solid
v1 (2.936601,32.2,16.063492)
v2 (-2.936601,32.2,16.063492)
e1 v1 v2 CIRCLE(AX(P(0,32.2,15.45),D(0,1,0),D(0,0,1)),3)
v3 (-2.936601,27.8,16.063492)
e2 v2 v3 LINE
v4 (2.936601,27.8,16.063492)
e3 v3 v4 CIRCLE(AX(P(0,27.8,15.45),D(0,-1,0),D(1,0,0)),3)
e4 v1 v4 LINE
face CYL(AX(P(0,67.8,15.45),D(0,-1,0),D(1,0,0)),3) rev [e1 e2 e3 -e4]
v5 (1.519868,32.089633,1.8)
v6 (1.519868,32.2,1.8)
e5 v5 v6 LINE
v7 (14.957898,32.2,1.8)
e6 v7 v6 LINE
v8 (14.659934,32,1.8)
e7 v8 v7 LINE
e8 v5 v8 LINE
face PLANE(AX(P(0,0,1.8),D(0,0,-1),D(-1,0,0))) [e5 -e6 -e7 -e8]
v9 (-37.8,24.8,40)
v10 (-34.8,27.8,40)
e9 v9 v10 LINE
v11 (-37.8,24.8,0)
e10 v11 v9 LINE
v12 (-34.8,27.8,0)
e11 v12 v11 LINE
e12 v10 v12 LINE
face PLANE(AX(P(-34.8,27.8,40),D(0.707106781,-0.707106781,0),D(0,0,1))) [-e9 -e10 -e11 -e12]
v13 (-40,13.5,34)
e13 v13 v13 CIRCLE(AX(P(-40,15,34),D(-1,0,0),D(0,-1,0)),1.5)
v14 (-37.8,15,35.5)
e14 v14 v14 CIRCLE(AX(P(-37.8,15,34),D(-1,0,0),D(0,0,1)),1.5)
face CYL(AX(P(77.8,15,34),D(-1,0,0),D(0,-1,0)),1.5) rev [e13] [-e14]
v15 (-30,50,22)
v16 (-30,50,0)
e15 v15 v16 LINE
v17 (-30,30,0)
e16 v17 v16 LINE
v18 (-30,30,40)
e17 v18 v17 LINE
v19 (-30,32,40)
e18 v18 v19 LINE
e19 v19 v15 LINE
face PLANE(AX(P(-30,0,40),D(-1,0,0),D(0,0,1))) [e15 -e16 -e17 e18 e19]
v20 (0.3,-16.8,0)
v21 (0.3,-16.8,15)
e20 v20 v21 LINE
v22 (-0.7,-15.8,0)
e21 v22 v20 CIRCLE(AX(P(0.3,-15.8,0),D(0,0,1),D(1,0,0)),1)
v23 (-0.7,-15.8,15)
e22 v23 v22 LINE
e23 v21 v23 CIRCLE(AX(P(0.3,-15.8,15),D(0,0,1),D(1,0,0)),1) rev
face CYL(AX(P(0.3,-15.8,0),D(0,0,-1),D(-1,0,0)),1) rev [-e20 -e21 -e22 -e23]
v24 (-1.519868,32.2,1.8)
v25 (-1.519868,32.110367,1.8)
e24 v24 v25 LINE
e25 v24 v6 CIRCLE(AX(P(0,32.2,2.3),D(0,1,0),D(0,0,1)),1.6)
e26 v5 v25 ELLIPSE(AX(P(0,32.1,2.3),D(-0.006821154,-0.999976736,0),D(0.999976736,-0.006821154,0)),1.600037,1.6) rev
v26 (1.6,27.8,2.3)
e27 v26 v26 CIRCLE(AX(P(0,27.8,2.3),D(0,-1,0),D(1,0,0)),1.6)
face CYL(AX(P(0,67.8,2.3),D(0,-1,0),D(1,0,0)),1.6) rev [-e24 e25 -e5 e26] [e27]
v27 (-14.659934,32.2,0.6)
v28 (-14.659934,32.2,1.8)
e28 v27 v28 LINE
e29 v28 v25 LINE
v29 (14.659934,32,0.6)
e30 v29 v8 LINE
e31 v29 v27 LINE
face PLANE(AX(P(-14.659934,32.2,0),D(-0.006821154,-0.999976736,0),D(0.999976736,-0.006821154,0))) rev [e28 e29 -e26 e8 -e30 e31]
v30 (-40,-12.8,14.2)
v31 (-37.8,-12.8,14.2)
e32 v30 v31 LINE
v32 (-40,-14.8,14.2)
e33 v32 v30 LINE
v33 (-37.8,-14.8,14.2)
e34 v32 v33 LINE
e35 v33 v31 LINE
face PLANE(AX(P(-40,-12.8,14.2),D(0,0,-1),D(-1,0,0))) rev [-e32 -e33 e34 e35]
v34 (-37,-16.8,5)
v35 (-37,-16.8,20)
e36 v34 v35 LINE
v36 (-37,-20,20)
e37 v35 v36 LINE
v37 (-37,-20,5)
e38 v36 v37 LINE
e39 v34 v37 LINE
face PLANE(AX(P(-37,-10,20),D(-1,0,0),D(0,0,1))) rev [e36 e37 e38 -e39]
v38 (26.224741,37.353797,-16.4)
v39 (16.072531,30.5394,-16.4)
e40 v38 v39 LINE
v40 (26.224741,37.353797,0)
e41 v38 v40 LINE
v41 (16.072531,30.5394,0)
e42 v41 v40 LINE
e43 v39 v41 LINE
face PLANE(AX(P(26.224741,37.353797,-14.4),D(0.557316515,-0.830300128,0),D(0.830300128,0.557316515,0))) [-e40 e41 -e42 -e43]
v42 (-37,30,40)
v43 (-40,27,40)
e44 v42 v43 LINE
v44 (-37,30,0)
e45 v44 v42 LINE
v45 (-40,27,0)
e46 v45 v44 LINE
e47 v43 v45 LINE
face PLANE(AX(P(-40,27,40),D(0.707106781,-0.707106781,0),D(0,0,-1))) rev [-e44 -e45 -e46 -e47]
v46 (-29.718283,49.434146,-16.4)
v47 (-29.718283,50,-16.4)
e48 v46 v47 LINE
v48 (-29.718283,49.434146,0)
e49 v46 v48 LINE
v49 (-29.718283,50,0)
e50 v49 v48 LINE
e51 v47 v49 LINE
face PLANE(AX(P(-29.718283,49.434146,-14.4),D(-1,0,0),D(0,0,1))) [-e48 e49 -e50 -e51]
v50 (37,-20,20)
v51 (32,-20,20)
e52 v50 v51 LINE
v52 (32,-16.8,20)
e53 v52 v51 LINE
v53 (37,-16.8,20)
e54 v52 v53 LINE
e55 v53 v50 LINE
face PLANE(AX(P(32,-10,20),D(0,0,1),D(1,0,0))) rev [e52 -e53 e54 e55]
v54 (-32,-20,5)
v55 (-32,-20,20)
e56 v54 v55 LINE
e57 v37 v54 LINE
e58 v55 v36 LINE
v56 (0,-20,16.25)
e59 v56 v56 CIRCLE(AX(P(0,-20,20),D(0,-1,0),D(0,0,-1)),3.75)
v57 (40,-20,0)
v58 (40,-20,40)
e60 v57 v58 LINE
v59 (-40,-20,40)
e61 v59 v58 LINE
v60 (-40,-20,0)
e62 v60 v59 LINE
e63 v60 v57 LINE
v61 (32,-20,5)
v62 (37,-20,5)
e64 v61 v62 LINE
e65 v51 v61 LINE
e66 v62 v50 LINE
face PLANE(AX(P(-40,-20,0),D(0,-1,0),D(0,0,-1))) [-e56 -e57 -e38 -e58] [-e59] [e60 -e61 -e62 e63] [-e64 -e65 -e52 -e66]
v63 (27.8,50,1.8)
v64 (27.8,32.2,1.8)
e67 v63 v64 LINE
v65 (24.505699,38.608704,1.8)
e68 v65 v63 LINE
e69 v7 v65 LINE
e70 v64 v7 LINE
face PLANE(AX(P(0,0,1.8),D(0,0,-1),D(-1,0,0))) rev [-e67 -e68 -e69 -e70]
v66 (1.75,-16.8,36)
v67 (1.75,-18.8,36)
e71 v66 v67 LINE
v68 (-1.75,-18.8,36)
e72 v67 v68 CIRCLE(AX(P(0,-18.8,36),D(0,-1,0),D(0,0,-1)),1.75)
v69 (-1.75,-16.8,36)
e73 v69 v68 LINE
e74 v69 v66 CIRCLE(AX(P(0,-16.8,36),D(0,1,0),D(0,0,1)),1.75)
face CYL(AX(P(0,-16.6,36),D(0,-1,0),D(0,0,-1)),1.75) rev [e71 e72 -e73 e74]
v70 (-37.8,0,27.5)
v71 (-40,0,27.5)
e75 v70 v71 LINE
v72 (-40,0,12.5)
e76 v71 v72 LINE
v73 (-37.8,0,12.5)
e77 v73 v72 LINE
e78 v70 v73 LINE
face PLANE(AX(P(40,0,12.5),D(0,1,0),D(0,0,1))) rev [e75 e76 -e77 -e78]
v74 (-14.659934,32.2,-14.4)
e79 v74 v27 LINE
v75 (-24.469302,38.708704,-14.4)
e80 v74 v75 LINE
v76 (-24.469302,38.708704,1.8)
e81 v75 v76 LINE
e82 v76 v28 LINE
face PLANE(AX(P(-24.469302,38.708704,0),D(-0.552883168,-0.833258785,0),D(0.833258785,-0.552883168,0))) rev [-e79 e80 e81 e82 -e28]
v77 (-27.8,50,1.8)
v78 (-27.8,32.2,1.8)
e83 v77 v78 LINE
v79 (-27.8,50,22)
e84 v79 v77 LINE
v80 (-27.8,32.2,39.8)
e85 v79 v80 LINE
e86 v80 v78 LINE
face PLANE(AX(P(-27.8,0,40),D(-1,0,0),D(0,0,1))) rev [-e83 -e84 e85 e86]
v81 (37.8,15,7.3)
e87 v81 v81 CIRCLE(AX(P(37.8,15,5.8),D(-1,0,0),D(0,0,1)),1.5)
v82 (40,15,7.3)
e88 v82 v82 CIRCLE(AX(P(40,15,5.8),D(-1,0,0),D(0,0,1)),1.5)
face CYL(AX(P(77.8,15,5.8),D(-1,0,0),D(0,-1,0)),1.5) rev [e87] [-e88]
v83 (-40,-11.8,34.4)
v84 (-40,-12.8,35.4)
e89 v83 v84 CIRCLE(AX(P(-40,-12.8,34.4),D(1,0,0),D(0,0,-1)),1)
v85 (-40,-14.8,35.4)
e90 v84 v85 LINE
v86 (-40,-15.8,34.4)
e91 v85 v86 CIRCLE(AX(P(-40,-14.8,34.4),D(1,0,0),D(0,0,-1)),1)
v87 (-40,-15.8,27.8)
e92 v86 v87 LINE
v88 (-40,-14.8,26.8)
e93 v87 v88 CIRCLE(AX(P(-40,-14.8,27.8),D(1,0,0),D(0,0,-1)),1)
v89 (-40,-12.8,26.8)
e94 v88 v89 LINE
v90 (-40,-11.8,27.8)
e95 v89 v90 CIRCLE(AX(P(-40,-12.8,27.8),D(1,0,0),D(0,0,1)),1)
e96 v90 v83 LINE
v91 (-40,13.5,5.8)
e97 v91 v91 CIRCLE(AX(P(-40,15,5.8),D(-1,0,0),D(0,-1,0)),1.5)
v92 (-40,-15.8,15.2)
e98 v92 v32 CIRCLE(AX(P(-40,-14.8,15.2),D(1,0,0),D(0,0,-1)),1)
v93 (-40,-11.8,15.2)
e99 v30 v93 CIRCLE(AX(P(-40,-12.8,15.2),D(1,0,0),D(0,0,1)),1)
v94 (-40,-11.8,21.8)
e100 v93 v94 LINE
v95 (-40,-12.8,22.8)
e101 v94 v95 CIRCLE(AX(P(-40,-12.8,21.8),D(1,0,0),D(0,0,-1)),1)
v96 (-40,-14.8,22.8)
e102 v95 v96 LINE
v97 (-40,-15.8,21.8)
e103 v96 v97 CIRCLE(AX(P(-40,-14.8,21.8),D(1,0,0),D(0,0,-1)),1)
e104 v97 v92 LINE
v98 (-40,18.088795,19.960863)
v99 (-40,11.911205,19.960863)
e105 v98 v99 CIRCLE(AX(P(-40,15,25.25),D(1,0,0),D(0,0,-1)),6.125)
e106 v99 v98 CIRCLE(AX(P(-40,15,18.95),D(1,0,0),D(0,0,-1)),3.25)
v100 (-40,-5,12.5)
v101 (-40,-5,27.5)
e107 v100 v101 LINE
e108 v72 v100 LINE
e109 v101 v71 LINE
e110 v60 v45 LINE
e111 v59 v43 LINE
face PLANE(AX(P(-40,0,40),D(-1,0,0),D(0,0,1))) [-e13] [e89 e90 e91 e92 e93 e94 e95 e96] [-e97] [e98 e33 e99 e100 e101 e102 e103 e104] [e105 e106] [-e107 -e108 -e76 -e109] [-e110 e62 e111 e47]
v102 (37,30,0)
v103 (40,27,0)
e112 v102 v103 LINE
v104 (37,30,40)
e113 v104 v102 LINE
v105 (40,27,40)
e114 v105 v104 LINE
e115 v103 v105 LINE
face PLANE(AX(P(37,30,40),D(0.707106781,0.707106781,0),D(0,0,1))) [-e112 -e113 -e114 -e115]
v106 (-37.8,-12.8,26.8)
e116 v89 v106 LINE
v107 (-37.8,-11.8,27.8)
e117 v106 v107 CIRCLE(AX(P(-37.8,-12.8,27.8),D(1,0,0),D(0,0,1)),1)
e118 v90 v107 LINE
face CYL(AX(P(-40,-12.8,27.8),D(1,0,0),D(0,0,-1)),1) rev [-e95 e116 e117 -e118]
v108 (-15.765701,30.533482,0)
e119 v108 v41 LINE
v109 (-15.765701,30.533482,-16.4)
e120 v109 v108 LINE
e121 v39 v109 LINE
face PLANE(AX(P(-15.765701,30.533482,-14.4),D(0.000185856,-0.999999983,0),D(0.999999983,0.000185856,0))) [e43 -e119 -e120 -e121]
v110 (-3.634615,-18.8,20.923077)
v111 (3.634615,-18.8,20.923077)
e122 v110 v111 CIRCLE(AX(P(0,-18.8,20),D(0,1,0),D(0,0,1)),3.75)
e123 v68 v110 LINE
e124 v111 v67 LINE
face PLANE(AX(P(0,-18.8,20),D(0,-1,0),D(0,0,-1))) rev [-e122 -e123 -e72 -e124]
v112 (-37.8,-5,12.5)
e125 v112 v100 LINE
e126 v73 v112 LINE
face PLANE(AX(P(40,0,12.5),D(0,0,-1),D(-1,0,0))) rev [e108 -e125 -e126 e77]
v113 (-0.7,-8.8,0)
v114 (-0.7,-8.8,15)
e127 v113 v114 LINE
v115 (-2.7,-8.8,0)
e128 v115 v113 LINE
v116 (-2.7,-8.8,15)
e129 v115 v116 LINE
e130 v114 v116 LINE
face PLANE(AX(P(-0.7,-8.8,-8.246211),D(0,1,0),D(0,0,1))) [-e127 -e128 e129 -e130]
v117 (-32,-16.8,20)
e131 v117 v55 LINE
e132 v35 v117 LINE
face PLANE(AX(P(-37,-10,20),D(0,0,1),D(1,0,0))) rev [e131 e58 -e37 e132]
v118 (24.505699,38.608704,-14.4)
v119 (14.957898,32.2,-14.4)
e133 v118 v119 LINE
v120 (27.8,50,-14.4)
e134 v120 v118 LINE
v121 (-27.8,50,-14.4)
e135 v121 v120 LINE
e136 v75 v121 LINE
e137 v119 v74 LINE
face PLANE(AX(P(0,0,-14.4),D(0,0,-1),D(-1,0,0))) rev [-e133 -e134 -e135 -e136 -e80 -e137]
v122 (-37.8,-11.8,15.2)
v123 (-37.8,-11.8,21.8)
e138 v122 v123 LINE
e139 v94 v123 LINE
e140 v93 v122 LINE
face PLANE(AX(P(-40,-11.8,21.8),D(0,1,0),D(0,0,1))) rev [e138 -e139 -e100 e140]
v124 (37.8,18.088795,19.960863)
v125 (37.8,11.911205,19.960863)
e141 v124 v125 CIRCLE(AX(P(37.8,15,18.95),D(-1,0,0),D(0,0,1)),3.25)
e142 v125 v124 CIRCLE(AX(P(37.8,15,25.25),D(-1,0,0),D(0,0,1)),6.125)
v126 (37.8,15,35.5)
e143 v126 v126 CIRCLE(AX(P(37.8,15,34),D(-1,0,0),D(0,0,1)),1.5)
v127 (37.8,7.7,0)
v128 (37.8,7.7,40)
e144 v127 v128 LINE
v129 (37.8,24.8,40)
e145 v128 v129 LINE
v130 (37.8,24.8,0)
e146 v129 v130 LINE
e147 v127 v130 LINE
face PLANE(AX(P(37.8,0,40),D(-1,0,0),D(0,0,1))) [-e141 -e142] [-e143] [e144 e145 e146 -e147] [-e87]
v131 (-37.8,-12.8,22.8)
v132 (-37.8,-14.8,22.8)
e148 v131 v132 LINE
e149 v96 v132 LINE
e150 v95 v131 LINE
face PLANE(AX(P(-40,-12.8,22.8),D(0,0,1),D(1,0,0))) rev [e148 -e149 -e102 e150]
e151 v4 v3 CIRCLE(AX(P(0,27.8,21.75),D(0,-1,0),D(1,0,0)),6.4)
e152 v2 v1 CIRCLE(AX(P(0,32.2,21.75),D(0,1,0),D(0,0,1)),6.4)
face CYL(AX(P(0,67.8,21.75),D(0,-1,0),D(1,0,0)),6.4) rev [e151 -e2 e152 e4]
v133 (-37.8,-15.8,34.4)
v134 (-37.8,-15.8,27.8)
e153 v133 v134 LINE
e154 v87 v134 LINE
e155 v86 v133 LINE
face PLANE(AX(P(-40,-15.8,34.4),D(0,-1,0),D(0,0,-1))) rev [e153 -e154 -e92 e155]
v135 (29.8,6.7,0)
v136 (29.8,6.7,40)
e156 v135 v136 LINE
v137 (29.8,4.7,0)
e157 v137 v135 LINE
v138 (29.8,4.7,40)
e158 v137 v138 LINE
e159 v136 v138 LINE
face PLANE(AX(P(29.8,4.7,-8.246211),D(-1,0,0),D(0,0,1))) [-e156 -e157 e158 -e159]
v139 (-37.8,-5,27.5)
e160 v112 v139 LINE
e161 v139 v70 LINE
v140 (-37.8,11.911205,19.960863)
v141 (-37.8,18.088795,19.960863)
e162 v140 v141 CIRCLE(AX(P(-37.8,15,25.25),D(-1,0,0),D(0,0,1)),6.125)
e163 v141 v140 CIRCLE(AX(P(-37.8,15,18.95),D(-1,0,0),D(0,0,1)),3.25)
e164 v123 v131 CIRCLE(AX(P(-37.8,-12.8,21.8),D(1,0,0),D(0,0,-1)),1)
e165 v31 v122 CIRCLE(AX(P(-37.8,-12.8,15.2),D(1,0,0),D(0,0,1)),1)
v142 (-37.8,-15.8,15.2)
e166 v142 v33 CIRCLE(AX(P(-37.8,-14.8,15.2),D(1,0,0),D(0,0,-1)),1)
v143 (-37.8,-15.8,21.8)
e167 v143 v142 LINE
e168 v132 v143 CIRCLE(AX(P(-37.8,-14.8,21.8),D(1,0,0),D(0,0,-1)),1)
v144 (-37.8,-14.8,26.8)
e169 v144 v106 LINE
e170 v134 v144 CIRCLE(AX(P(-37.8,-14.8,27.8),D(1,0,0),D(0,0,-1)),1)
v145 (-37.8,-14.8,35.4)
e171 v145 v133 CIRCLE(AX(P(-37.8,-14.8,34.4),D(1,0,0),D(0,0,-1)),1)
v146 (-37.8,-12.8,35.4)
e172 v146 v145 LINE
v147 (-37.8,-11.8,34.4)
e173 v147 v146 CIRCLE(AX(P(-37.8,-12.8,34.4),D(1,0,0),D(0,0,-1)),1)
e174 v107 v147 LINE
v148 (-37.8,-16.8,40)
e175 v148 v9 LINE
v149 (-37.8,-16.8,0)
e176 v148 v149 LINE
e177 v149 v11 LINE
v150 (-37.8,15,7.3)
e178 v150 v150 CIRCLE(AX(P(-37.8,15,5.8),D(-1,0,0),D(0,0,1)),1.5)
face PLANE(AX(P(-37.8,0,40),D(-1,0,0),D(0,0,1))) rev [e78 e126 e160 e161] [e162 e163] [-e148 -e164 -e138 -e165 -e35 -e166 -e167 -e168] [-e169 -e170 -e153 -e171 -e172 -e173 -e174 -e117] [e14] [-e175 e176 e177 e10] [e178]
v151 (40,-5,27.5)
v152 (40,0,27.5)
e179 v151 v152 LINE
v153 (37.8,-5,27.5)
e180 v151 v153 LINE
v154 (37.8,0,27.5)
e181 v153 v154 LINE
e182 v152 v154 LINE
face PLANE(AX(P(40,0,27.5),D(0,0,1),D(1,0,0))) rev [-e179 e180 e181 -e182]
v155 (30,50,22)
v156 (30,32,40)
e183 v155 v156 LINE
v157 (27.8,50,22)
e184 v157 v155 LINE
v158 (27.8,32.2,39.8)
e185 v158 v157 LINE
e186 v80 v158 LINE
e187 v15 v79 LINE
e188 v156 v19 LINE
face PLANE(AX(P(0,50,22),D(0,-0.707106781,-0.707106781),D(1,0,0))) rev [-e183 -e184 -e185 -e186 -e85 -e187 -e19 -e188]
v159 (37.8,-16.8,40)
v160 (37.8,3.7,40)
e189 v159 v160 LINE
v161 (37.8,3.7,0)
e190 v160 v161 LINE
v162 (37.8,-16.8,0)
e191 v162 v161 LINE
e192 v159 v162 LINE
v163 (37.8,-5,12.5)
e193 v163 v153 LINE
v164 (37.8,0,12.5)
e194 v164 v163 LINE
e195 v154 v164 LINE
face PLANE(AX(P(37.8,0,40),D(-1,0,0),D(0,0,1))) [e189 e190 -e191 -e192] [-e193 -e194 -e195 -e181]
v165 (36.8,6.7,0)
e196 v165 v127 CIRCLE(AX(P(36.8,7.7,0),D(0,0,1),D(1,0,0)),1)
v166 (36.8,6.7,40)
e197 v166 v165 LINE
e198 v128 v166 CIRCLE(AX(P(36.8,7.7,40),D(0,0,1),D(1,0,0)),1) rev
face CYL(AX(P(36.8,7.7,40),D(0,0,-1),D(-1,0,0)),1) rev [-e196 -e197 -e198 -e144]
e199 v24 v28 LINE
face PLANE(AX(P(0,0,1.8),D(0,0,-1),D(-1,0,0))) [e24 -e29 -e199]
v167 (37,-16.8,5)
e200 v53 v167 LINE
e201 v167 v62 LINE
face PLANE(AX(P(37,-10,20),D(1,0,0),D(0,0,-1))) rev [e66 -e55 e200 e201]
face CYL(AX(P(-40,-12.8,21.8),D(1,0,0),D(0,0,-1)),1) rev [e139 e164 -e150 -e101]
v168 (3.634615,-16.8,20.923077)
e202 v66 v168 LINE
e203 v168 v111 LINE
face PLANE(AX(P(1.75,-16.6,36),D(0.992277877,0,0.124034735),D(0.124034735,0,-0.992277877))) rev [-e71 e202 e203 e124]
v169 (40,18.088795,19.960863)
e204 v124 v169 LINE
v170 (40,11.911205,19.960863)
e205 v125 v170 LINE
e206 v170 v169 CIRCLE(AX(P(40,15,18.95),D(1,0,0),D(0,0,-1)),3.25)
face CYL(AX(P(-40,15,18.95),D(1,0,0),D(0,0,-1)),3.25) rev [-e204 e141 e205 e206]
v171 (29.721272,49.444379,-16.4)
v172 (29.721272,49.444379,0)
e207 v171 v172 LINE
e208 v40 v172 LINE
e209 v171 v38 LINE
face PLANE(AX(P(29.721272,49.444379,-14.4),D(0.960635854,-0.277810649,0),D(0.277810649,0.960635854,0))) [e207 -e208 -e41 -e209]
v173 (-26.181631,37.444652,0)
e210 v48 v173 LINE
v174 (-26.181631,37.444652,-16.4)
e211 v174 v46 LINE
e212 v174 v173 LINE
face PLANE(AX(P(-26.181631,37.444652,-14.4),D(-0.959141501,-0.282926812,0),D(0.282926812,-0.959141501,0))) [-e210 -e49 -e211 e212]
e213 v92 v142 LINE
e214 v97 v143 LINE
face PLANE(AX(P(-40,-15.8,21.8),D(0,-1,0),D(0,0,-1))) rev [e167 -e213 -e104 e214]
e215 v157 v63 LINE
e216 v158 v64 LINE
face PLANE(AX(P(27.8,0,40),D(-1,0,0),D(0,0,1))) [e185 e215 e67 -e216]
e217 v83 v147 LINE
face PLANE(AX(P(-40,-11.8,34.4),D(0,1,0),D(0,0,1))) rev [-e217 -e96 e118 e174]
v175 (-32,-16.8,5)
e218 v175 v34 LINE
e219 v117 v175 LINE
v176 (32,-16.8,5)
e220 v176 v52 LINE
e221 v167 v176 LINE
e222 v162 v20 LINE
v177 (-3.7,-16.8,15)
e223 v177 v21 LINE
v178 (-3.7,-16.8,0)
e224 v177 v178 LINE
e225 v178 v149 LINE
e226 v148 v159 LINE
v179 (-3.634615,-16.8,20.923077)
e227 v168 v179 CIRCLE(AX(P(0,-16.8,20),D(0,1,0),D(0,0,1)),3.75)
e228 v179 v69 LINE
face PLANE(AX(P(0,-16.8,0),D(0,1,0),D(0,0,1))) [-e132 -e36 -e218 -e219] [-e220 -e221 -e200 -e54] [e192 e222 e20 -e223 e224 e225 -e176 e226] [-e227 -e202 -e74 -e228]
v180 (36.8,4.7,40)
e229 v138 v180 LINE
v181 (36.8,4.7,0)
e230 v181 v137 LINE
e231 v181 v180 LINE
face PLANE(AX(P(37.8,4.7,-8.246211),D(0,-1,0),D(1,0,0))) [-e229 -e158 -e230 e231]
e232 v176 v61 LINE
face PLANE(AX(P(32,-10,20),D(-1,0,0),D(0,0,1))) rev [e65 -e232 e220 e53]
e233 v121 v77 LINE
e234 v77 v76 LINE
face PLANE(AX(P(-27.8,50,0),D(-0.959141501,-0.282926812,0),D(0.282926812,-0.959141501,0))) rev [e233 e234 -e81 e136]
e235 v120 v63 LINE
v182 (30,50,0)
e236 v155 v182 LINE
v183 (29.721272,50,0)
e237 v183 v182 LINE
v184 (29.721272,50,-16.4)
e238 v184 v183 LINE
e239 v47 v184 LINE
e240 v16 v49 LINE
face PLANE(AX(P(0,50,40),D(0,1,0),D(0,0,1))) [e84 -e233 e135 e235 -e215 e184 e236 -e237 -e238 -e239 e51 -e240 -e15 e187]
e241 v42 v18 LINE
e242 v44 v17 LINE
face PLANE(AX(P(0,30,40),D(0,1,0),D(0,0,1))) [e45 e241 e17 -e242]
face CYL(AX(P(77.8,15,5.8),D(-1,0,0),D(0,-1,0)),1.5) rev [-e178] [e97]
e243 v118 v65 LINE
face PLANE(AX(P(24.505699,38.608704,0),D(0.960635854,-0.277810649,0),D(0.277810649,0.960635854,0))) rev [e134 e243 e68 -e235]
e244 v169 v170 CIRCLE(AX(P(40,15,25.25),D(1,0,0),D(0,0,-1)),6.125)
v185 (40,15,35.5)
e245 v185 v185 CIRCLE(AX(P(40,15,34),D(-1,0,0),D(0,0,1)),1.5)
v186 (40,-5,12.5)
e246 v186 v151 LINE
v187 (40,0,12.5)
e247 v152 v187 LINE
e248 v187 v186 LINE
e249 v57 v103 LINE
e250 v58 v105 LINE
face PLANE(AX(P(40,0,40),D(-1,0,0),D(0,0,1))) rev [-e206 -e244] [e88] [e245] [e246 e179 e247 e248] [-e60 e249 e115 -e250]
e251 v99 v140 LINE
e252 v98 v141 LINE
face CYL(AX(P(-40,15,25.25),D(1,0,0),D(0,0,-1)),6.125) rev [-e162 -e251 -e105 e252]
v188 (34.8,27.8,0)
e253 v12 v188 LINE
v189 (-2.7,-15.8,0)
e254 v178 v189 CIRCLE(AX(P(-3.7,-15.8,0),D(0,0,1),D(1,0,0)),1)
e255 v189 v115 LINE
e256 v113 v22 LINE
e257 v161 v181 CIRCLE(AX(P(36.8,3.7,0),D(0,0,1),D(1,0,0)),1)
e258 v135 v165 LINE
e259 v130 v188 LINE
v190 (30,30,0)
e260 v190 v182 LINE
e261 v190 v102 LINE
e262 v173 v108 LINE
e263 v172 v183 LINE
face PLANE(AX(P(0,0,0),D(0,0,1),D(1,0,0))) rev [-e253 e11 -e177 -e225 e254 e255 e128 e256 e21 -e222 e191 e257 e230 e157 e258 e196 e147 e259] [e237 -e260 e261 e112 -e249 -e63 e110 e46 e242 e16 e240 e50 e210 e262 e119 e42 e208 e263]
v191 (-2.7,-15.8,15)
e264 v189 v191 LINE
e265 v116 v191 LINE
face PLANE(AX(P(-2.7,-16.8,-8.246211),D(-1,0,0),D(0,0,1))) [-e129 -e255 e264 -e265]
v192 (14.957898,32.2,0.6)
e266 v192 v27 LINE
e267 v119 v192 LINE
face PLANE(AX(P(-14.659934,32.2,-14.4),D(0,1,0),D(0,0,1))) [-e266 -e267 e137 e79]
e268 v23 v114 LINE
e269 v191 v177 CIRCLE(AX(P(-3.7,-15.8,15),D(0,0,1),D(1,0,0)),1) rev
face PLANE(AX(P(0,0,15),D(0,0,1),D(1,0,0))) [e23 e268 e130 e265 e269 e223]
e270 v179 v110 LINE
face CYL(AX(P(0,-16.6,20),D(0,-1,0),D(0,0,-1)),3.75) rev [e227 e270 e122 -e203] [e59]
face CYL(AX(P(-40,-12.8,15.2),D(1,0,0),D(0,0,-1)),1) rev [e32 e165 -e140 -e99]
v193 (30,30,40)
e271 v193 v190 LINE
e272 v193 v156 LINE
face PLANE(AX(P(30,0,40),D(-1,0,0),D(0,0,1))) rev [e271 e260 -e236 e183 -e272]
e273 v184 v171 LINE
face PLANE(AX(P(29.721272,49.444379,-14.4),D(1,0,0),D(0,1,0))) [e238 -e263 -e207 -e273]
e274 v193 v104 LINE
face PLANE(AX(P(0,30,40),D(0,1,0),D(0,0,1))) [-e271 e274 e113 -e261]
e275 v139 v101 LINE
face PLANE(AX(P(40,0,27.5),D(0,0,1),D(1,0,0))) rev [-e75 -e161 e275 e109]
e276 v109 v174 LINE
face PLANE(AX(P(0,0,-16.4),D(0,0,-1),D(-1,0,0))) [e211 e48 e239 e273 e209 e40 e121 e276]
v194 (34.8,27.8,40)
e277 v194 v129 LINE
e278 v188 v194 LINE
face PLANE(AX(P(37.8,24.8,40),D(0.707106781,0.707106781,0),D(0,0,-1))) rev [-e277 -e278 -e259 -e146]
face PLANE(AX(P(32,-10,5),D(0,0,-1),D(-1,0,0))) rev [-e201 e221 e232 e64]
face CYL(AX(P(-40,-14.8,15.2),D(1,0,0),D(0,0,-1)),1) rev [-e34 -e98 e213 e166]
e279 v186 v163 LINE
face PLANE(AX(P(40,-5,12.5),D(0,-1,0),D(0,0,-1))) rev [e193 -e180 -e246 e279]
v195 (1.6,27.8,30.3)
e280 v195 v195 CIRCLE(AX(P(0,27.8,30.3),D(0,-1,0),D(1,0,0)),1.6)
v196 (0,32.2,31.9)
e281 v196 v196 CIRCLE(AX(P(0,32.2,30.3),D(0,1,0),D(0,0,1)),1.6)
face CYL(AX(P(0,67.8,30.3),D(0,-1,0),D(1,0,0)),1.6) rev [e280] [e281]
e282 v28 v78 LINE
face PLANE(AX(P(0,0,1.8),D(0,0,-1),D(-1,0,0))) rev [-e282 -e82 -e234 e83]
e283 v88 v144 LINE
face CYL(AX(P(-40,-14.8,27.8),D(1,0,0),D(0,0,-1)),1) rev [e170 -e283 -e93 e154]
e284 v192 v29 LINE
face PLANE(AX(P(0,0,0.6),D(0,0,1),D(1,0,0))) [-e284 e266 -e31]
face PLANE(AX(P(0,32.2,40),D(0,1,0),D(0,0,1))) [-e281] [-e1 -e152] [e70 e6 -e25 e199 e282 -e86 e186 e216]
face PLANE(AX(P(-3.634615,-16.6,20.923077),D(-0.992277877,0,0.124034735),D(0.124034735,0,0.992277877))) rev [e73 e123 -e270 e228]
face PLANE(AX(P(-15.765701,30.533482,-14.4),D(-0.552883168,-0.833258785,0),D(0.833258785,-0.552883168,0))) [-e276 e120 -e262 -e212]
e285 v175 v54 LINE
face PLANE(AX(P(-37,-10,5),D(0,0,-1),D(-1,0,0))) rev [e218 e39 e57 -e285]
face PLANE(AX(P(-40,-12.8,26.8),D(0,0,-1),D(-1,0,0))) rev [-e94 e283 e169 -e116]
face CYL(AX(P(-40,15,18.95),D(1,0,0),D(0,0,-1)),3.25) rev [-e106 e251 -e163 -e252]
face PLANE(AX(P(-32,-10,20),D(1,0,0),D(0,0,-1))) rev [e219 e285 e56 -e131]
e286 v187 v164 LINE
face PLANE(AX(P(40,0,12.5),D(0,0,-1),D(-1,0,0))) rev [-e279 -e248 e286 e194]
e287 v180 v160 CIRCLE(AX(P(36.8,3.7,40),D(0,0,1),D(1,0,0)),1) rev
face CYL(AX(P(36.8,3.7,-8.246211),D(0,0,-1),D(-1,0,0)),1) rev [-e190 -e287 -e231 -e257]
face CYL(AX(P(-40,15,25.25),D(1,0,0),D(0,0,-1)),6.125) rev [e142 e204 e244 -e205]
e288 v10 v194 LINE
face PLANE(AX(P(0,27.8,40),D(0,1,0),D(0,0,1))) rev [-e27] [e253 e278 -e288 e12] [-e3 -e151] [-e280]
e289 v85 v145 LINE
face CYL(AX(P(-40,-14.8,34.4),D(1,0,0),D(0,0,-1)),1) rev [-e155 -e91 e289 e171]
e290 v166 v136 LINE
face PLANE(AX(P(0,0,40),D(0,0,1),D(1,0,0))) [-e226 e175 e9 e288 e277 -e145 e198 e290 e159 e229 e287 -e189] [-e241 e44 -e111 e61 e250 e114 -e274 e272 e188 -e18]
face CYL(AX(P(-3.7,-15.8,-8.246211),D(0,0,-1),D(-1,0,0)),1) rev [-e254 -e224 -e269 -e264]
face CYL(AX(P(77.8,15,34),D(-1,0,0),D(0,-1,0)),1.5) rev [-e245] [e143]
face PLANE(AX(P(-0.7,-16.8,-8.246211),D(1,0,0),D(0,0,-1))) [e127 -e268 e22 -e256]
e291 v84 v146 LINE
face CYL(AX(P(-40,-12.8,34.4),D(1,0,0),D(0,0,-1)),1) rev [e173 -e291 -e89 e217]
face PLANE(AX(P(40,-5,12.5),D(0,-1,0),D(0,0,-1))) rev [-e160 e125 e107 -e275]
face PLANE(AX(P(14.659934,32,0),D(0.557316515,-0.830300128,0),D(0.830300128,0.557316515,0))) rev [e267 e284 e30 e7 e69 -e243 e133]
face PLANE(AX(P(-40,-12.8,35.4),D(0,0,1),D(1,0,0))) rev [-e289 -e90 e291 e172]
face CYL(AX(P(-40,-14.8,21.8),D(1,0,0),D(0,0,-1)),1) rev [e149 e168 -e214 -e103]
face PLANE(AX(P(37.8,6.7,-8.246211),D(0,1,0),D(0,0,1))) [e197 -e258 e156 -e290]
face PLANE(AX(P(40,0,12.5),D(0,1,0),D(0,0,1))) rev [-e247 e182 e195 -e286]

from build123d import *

# Parameters (mm, degrees)
SKETCH1_W               = 80
SKETCH1_H               = 60
SKETCH1_W_2             = 75.6
SKETCH1_H_2             = 55.6
BOSS_EXTRUDE1_DEPTH     = 40
CHAMFER1_SIZE           = 18
SKETCH2_W               = 60
SKETCH2_H               = 20
BOSS_EXTRUDE2_DEPTH     = 1.8
SKETCH5_W               = 80
SKETCH5_H               = 50
SKETCH5_W_2             = 75.6
SKETCH5_H_2             = 45.6
BOSS_EXTRUDE3_DEPTH     = 40
SKETCH6_W               = 80
SKETCH6_H               = 10
CUT_EXTRUDE3_DEPTH      = 40
SKETCH7_R               = 1.6
SKETCH7_R_2             = 6.4
SKETCH7_R_3             = 3
CUT_EXTRUDE4_DEPTH      = 40
CUT_EXTRUDE5_DEPTH      = 101.761302096
CUT_EXTRUDE5_DEPTH_BACK = 40
SKETCH3_R               = 1.5
SKETCH4_R               = 3.25
SKETCH4_R_2             = 6.125
CUT_EXTRUDE6_DEPTH      = 103.46950766
SKETCH10_W              = 80
SKETCH10_H              = 40
BOSS_EXTRUDE4_DEPTH     = 1
SKETCH12_W              = 15
SKETCH12_H              = 5
CUT_EXTRUDE10_DEPTH     = 103.46950766
SKETCH13_W              = 5
SKETCH13_H              = 15
CUT_EXTRUDE11_DEPTH     = 10
CUT_EXTRUDE12_DEPTH     = 75.560311158
BOSS_EXTRUDE5_START     = -1.2
BOSS_EXTRUDE5_DEPTH     = 15
BOSS_EXTRUDE8_DEPTH     = 2
CHAMFER2_SIZE           = 3
CHAMFER3_SIZE           = 3
CUT_EXTRUDE15_START     = -1.2
CUT_EXTRUDE15_DEPTH     = 2.2
CUT_EXTRUDE16_START     = -2.2
SKETCH26_R              = 3.75
CUT_EXTRUDE16_DEPTH     = 2.2
BOSS_EXTRUDE9_START     = -25
SKETCH27_W              = 2
SKETCH27_H              = 8
BOSS_EXTRUDE9_DEPTH     = 15
FILLET1_R               = 1
SKETCH28_W              = 8
SKETCH28_H              = 2
BOSS_EXTRUDE10_DEPTH    = 40
FILLET2_R               = 1
CUT_EXTRUDE17_DEPTH     = 101.761302096


with BuildPart() as part:
    # Sketch1 → Boss-Extrude1 (new body)
    # profile 1 of 2: a face of its own
    with BuildSketch(Plane.XY):
        Polygon((-30, 50), (-30, 30), (30, 30), (30, 50), (27.8, 50), (27.8, 47.8), (27.8, 32.2), (-27.8, 32.2), (-27.8, 47.8), (-27.8, 50), align=None)
    # profile 2 of 2: a face of its own
    with BuildSketch(Plane.XY):
        Rectangle(SKETCH1_W, SKETCH1_H)
        Rectangle(SKETCH1_W_2, SKETCH1_H_2, mode=Mode.SUBTRACT)
    extrude(amount=BOSS_EXTRUDE1_DEPTH)

    # Chamfer1
    # the kernel refuses this chamfer: 18 mm, written as the material it takes off along each edge
    with BuildSketch(Plane(origin=(76.290293783, 50, 40), x_dir=(0, -0.9996219169112966, 0.02749587661058639), z_dir=(-1, 0, 0)), Plane(origin=(18.490293783, 50, 40), x_dir=(0, -0.9996219169112966, 0.02749587661058639), z_dir=(-1, 0, 0))) as chamfer1_piece_1:
        Polygon((CHAMFER1_SIZE * 0.999621916911, -CHAMFER1_SIZE * 0.0274958766106), (-CHAMFER1_SIZE * 0.0274958766106, -CHAMFER1_SIZE * 0.999621916911), (0, 0), align=None)
    extrude(amount=94.780587567, mode=Mode.SUBTRACT)

    # Sketch2 → Boss-Extrude2 (add)
    with BuildSketch(Plane(origin=(0, 0, 0), x_dir=(-1, 0, 0), z_dir=(0, 0, -1))):
        with Locations((0, 40)):
            Rectangle(SKETCH2_W, SKETCH2_H)
    extrude(amount=-BOSS_EXTRUDE2_DEPTH)

    # Sketch5 → Boss-Extrude3 (add)
    with BuildSketch(Plane.XY.offset(40)):
        with Locations((0, 5)):
            Rectangle(SKETCH5_W, SKETCH5_H)
        with Locations((0, 5)):
            Rectangle(SKETCH5_W_2, SKETCH5_H_2, mode=Mode.SUBTRACT)
    extrude(amount=-BOSS_EXTRUDE3_DEPTH)

    # Sketch6 → Cut-Extrude3 (cut)
    with BuildSketch(Plane.XY.offset(40)):
        with Locations((0, -25)):
            Rectangle(SKETCH6_W, SKETCH6_H)
    extrude(amount=-CUT_EXTRUDE3_DEPTH, mode=Mode.SUBTRACT)

    # Sketch7 → Cut-Extrude4 (cut)
    with BuildSketch(Plane.XZ.offset(-27.8)):
        with Locations((0, 2.3)):
            Circle(SKETCH7_R)
        with Locations((0, 21.75)):
            Circle(SKETCH7_R_2)
        with Locations((0, 15.45)):
            Circle(SKETCH7_R_3)
        with Locations((0, 30.3)):
            Circle(SKETCH7_R)
    extrude(amount=-CUT_EXTRUDE4_DEPTH, mode=Mode.SUBTRACT)

    # Sketch3 → Cut-Extrude5 (cut, two sides: drawn at the far end of the back side and taken through both)
    with BuildSketch(Plane.ZY.offset(-37.8).offset(-CUT_EXTRUDE5_DEPTH_BACK)):
        with Locations((34, 15)):
            Circle(SKETCH3_R)
        with Locations((5.8, 15)):
            Circle(SKETCH3_R)
    extrude(amount=CUT_EXTRUDE5_DEPTH + CUT_EXTRUDE5_DEPTH_BACK, mode=Mode.SUBTRACT)

    # Sketch4 → Cut-Extrude6 (cut, through all)
    with BuildSketch(Plane(origin=(40, 0, 0), x_dir=(0, 0, -1), z_dir=(1, 0, 0))):
        with Locations((-18.95, 15)):
            Circle(SKETCH4_R)
        with Locations((-25.25, 15)):
            Circle(SKETCH4_R_2)
    extrude(amount=-CUT_EXTRUDE6_DEPTH, mode=Mode.SUBTRACT)

    # Sketch10 → Boss-Extrude4 (add)
    with BuildSketch(Plane(origin=(0, -17.8, 0), x_dir=(1, 0, 0), z_dir=(0, 1, 0))):
        with Locations((0, -20)):
            Rectangle(SKETCH10_W, SKETCH10_H)
    extrude(amount=BOSS_EXTRUDE4_DEPTH)

    # Sketch12 → Cut-Extrude10 (cut, through all)
    with BuildSketch(Plane.ZY.offset(40)):
        with Locations((20, -2.5)):
            Rectangle(SKETCH12_W, SKETCH12_H)
    extrude(amount=-CUT_EXTRUDE10_DEPTH, mode=Mode.SUBTRACT)

    # Sketch13 → Cut-Extrude11 (cut)
    with BuildSketch(Plane.XZ.offset(20)):
        with Locations((-34.5, 12.5)):
            Rectangle(SKETCH13_W, SKETCH13_H)
        with Locations((34.5, 12.5)):
            Rectangle(SKETCH13_W, SKETCH13_H)
    extrude(amount=-CUT_EXTRUDE11_DEPTH, mode=Mode.SUBTRACT)

    # Sketch14 → Cut-Extrude12 (cut, through all)
    with BuildSketch(Plane.XY.offset(1.8)):
        Polygon((-27.8, 50), (-24.469302189, 38.708703588), (-14.659934208, 32.2), (14.659934208, 32), (24.505699212, 38.608703588), (27.8, 50), align=None)
    extrude(amount=-CUT_EXTRUDE12_DEPTH, mode=Mode.SUBTRACT)

    # Sketch15 → Boss-Extrude5 (add)
    with BuildSketch(Plane.XY.offset(1.8).offset(BOSS_EXTRUDE5_START)):
        Polygon((27.8, 50), (24.505699212, 38.608703588), (14.957897791, 32.2), (-14.659934208, 32.2), (-24.469302189, 38.708703588), (-27.8, 50), (-29.718283002, 50), (-29.718283002, 49.434146376), (-26.181631315, 37.44465205), (-15.765700543, 30.53348243), (16.07253082, 30.539399744), (26.224741306, 37.353796576), (29.721271707, 49.444378702), (29.721271707, 50), align=None)
    extrude(amount=-BOSS_EXTRUDE5_DEPTH)

    # Sketch22 → Boss-Extrude8 (add)
    with BuildSketch(Plane(origin=(0, 0, -14.4), x_dir=(-1, 0, 0), z_dir=(0, 0, -1))):
        Polygon((-26.224741306, 37.353796576), (-16.07253082, 30.539399744), (15.765700543, 30.53348243), (26.181631315, 37.44465205), (29.718283002, 49.434146376), (29.718283002, 50), (27.8, 50), (24.469302189, 38.708703588), (14.659934208, 32.2), (-14.957897791, 32.2), (-24.505699212, 38.608703588), (-27.8, 50), (-29.721271707, 50), (-29.721271707, 49.444378702), align=None)
        Polygon((-27.8, 50), (27.8, 50), (24.469302189, 38.708703588), (14.659934208, 32.2), (-14.957897791, 32.2), (-24.505699212, 38.608703588), align=None)
    extrude(amount=BOSS_EXTRUDE8_DEPTH)

    # Chamfer2
    chamfer2_edges = [part.edges().sort_by_distance(p)[0] for p in [
        (37.8, 27.8, 20),
        (-37.8, 27.8, 20),
    ]]
    chamfer(chamfer2_edges, length=CHAMFER2_SIZE)

    # Chamfer3
    chamfer3_edges = [part.edges().sort_by_distance(p)[0] for p in [
        (40, 30, 20),
        (-40, 30, 20),
    ]]
    chamfer(chamfer3_edges, length=CHAMFER3_SIZE)

    # Sketch25 → Cut-Extrude15 (cut)
    with BuildSketch(Plane.XZ.offset(20).offset(CUT_EXTRUDE15_START)):
        with BuildLine():
            Line((-3.634615385, 20.923076923), (-1.75, 36))
            ThreePointArc((-1.75, 36), (0, 37.75), (1.75, 36))
            Line((1.75, 36), (3.634615385, 20.923076923))
            ThreePointArc((3.634615385, 20.923076923), (0, 16.25), (-3.634615385, 20.923076923))
        make_face()
    extrude(amount=-CUT_EXTRUDE15_DEPTH, mode=Mode.SUBTRACT)

    # Sketch26 → Cut-Extrude16 (cut)
    with BuildSketch(Plane(origin=(0, -18.8, 0), x_dir=(1, 0, 0), z_dir=(0, 1, 0)).offset(CUT_EXTRUDE16_START)):
        with Locations(Location((0, -20, 0), (0, 0, 90))):
            Circle(SKETCH26_R)
    extrude(amount=CUT_EXTRUDE16_DEPTH, mode=Mode.SUBTRACT)

    # Sketch27 → Boss-Extrude9 (add)
    with BuildSketch(Plane.XY.offset(40).offset(BOSS_EXTRUDE9_START)):
        with Locations((-1.7, -12.8)):
            Rectangle(SKETCH27_W, SKETCH27_H)
    extrude(amount=-BOSS_EXTRUDE9_DEPTH)

    # Fillet1
    fillet1_edges = [part.edges().sort_by_distance(p)[0] for p in [
        (-0.7, -16.8, 7.5),
        (-2.7, -16.8, 7.5),
    ]]
    fillet(fillet1_edges, radius=FILLET1_R)

    # Sketch28 → Boss-Extrude10 (add)
    with BuildSketch(Plane.XY.offset(40)):
        with Locations((33.8, 5.7)):
            Rectangle(SKETCH28_W, SKETCH28_H)
    extrude(amount=-BOSS_EXTRUDE10_DEPTH)

    # Fillet2
    fillet2_edges = [part.edges().sort_by_distance(p)[0] for p in [
        (37.8, 6.7, 20),
        (37.8, 4.7, 20),
    ]]
    fillet(fillet2_edges, radius=FILLET2_R)

    # Sketch29 → Cut-Extrude17 (cut, through all)
    with BuildSketch(Plane(origin=(-37.8, 0, 0), x_dir=(0, 0, -1), z_dir=(1, 0, 0))):
        with BuildLine():
            Line((-34.4, -11.8), (-27.8, -11.8))
            ThreePointArc((-27.8, -11.8), (-27.092893219, -12.092893219), (-26.8, -12.8))
            Line((-26.8, -12.8), (-26.8, -14.8))
            ThreePointArc((-26.8, -14.8), (-27.092893219, -15.507106781), (-27.8, -15.8))
            Line((-27.8, -15.8), (-34.4, -15.8))
            ThreePointArc((-34.4, -15.8), (-35.107106781, -15.507106781), (-35.4, -14.8))
            Line((-35.4, -14.8), (-35.4, -12.8))
            ThreePointArc((-35.4, -12.8), (-35.107106781, -12.092893219), (-34.4, -11.8))
        make_face()
        with BuildLine():
            Line((-21.8, -11.8), (-15.2, -11.8))
            ThreePointArc((-15.2, -11.8), (-14.492893219, -12.092893219), (-14.2, -12.8))
            Line((-14.2, -12.8), (-14.2, -14.8))
            ThreePointArc((-14.2, -14.8), (-14.492893219, -15.507106781), (-15.2, -15.8))
            Line((-15.2, -15.8), (-21.8, -15.8))
            ThreePointArc((-21.8, -15.8), (-22.507106781, -15.507106781), (-22.8, -14.8))
            Line((-22.8, -14.8), (-22.8, -12.8))
            ThreePointArc((-22.8, -12.8), (-22.507106781, -12.092893219), (-21.8, -11.8))
        make_face()
    extrude(amount=-CUT_EXTRUDE17_DEPTH, mode=Mode.SUBTRACT)


solid = part.part
